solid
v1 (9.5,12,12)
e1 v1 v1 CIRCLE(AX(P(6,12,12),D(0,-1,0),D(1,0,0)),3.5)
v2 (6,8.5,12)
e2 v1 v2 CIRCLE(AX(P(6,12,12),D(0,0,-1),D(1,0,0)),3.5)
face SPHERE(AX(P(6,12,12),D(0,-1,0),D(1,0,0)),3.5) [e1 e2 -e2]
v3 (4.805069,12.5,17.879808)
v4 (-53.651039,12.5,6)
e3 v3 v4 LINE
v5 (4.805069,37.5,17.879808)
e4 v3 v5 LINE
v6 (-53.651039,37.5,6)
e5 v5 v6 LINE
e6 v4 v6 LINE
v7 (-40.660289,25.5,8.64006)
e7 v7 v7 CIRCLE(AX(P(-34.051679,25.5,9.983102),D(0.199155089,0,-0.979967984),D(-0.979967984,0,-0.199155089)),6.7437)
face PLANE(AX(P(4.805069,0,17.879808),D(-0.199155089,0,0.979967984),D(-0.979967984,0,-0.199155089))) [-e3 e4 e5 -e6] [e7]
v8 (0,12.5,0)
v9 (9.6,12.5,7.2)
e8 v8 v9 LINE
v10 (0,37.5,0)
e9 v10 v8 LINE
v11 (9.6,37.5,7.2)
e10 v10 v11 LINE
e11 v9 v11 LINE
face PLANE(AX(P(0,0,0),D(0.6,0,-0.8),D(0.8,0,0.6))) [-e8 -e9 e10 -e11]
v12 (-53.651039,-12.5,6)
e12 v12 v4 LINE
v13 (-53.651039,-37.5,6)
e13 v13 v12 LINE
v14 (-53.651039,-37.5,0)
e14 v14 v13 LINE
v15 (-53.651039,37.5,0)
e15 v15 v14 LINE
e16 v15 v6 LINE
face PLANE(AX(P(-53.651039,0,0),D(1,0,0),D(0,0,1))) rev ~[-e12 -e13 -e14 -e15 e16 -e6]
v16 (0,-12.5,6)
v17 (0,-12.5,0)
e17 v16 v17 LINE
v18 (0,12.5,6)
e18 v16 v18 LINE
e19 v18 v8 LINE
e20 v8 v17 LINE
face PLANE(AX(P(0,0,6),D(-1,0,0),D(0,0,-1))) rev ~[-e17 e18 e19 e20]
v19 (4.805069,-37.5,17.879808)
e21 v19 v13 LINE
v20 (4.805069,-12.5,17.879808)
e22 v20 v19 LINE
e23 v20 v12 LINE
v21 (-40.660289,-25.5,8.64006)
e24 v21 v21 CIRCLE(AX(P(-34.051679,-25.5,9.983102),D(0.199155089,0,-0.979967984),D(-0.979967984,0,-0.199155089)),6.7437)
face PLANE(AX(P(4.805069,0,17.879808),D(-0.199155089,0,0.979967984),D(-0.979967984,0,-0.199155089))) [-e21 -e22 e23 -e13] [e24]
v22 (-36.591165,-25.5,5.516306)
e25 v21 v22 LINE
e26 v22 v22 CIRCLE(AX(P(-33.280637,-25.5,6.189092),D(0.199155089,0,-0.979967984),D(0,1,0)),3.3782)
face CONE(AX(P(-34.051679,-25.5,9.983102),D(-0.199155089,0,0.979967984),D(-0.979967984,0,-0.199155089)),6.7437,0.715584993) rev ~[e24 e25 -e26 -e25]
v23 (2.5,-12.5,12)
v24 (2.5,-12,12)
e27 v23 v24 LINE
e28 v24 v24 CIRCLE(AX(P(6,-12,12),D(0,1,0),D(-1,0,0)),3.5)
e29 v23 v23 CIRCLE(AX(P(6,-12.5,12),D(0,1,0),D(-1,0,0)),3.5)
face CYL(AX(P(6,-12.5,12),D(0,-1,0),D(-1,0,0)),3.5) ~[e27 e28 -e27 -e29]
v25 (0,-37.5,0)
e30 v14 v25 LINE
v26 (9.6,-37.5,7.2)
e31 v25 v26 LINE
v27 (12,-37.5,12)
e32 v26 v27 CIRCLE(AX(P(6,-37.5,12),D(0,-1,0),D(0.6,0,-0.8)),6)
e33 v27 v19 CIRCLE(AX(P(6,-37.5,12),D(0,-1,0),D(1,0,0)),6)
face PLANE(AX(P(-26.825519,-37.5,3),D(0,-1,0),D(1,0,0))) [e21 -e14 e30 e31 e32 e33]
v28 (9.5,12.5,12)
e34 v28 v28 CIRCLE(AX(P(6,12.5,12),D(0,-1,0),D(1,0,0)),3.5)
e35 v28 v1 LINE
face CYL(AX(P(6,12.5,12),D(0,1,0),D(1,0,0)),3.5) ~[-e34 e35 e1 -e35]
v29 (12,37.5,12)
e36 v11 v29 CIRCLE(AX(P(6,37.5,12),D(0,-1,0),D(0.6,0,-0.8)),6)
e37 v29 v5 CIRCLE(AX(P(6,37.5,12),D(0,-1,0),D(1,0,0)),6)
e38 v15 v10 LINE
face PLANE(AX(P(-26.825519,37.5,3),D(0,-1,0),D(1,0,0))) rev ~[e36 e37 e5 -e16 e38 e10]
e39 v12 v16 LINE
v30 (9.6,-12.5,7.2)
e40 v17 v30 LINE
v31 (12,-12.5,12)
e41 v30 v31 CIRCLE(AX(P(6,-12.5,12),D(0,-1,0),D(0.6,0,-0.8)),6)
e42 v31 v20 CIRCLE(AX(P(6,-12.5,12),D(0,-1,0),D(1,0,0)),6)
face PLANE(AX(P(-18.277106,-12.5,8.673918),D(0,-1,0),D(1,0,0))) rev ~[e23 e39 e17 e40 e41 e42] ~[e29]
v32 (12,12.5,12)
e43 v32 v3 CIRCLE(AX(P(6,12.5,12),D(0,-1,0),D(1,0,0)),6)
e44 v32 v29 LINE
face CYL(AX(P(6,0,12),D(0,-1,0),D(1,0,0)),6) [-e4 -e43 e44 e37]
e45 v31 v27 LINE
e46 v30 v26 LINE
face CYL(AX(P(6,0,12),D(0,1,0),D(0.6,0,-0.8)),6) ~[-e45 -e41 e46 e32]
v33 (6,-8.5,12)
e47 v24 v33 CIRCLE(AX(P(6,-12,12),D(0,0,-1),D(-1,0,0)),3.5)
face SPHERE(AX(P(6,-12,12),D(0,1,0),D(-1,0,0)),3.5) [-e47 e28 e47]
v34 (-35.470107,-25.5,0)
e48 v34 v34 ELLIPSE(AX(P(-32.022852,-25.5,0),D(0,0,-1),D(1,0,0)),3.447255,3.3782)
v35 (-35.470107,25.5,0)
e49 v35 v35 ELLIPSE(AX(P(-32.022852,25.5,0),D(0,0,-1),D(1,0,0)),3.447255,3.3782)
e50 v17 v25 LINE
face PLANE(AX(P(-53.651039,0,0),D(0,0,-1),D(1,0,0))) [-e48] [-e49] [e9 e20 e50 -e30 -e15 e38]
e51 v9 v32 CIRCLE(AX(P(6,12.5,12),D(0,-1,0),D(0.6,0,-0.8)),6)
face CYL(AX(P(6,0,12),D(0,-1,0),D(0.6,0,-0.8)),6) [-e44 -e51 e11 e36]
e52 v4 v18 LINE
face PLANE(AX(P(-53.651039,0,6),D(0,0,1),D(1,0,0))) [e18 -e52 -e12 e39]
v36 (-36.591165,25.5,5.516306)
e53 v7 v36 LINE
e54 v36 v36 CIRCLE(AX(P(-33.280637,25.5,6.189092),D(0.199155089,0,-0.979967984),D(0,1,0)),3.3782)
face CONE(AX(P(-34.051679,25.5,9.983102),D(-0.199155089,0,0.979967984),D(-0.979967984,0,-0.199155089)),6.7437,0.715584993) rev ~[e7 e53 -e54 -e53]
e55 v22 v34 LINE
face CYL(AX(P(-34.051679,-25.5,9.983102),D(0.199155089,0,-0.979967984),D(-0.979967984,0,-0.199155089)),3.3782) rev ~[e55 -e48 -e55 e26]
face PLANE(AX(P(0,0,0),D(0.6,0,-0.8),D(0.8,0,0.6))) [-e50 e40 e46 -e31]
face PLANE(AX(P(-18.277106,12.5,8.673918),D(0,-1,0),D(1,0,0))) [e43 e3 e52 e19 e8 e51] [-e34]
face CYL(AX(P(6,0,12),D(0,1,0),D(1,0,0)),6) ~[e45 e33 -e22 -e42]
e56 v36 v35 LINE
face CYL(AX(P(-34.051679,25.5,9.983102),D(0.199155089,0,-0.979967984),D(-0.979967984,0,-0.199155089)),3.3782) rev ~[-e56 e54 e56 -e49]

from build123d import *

# Parameters (mm, degrees)
F0_W            = 53.6510385573
F0_H            = 6
F0_R            = 3
F1_DEPTH        = 37.5
F1_DEPTH_BACK   = 37.5
F3_DEPTH        = 12.5
F3_DEPTH_BACK   = 12.5
F4_R            = 3.5
F5_DEPTH        = 4
F6_R            = 3.5
F7_DEPTH        = 4
F8_R            = 3.5
F10_D           = 6.7564
F10_CSINK_D     = 13.4874
F10_CSINK_ANGLE = 82


# Not quite as in the source:
# - a feature of the source that left no trace in its solid (it failed there, or was rolled back) is left out


with BuildPart() as f1:
    # F0 (on Front) → F1 (new body, two sides)
    with BuildSketch(Plane.XZ) as f1_sk:
        with Locations((-26.8255192786, 3)):
            Rectangle(F0_W, F0_H)
        with BuildLine():
            Line((0, 6), (0, 0))
            Line((0, 0), (9.6, 7.2))
            ThreePointArc((9.6, 7.2), (0.5263664708, 9.5424939495), (4.8050694646, 17.8798079064))
            Line((4.8050694646, 17.8798079064), (-53.6510385573, 6))
            Line((-53.6510385573, 6), (0, 6))
        make_face()
        with BuildLine():
            ThreePointArc((4.8050694646, 17.8798079064), (0.5263664708, 9.5424939495), (9.6, 7.2))
            ThreePointArc((9.6, 7.2), (11.366563146, 9.316718427), (12, 12))
            ThreePointArc((12, 12), (9.7967365452, 16.6459435647), (4.8050694646, 17.8798079064))
        make_face()
        with Locations((6, 12)):
            Circle(F0_R, mode=Mode.SUBTRACT)
        with Locations((6, 12)):
            Circle(F0_R)
    extrude(amount=F1_DEPTH)
    extrude(f1_sk.sketch, amount=-F1_DEPTH_BACK)

    # F0 (on Front) → F3 (cut, two sides)
    with BuildSketch(Plane.XZ) as f3_sk:
        with BuildLine():
            Line((0, 6), (0, 0))
            Line((0, 0), (9.6, 7.2))
            ThreePointArc((9.6, 7.2), (0.5263664708, 9.5424939495), (4.8050694646, 17.8798079064))
            Line((4.8050694646, 17.8798079064), (-53.6510385573, 6))
            Line((-53.6510385573, 6), (0, 6))
        make_face()
        with BuildLine():
            ThreePointArc((4.8050694646, 17.8798079064), (0.5263664708, 9.5424939495), (9.6, 7.2))
            ThreePointArc((9.6, 7.2), (11.366563146, 9.316718427), (12, 12))
            ThreePointArc((12, 12), (9.7967365452, 16.6459435647), (4.8050694646, 17.8798079064))
        make_face()
        with Locations((6, 12)):
            Circle(F0_R, mode=Mode.SUBTRACT)
        with Locations((6, 12)):
            Circle(F0_R)
    extrude(amount=F3_DEPTH, mode=Mode.SUBTRACT)
    extrude(f3_sk.sketch, amount=-F3_DEPTH_BACK, mode=Mode.SUBTRACT)

    # F4 (on face) → F5 (join)
    with BuildSketch(Plane.XZ.offset(-12.5)):
        with Locations((6, 12)):
            Circle(F4_R)
    extrude(amount=F5_DEPTH)

    # F6 (on face) → F7 (join)
    with BuildSketch(Plane(origin=(0, -12.5, 0), x_dir=(-1, 0, 0), z_dir=(0, 1, 0))):
        with Locations((-6, 12)):
            Circle(F6_R)
    extrude(amount=F7_DEPTH)

    # F8
    f8_edges = [f1.edges().sort_by_distance(p)[0] for p in [
        (9.5, -8.5, 12),
        (2.5, 8.5, 12),
    ]]
    fillet(f8_edges, radius=F8_R)

    # F10 (through all)
    with Locations(Plane(origin=(-3.2989413744, 0, 16.2328612433), x_dir=(0.9799679844, 0, 0.1991550892), z_dir=(-0.1991550892, 0, 0.9799679844))):
        with Locations((-31.3813695802, -25.5), (-31.3813695802, 25.5)):
            CounterSinkHole(F10_D / 2, F10_CSINK_D / 2, counter_sink_angle=F10_CSINK_ANGLE)


solid = f1.part
